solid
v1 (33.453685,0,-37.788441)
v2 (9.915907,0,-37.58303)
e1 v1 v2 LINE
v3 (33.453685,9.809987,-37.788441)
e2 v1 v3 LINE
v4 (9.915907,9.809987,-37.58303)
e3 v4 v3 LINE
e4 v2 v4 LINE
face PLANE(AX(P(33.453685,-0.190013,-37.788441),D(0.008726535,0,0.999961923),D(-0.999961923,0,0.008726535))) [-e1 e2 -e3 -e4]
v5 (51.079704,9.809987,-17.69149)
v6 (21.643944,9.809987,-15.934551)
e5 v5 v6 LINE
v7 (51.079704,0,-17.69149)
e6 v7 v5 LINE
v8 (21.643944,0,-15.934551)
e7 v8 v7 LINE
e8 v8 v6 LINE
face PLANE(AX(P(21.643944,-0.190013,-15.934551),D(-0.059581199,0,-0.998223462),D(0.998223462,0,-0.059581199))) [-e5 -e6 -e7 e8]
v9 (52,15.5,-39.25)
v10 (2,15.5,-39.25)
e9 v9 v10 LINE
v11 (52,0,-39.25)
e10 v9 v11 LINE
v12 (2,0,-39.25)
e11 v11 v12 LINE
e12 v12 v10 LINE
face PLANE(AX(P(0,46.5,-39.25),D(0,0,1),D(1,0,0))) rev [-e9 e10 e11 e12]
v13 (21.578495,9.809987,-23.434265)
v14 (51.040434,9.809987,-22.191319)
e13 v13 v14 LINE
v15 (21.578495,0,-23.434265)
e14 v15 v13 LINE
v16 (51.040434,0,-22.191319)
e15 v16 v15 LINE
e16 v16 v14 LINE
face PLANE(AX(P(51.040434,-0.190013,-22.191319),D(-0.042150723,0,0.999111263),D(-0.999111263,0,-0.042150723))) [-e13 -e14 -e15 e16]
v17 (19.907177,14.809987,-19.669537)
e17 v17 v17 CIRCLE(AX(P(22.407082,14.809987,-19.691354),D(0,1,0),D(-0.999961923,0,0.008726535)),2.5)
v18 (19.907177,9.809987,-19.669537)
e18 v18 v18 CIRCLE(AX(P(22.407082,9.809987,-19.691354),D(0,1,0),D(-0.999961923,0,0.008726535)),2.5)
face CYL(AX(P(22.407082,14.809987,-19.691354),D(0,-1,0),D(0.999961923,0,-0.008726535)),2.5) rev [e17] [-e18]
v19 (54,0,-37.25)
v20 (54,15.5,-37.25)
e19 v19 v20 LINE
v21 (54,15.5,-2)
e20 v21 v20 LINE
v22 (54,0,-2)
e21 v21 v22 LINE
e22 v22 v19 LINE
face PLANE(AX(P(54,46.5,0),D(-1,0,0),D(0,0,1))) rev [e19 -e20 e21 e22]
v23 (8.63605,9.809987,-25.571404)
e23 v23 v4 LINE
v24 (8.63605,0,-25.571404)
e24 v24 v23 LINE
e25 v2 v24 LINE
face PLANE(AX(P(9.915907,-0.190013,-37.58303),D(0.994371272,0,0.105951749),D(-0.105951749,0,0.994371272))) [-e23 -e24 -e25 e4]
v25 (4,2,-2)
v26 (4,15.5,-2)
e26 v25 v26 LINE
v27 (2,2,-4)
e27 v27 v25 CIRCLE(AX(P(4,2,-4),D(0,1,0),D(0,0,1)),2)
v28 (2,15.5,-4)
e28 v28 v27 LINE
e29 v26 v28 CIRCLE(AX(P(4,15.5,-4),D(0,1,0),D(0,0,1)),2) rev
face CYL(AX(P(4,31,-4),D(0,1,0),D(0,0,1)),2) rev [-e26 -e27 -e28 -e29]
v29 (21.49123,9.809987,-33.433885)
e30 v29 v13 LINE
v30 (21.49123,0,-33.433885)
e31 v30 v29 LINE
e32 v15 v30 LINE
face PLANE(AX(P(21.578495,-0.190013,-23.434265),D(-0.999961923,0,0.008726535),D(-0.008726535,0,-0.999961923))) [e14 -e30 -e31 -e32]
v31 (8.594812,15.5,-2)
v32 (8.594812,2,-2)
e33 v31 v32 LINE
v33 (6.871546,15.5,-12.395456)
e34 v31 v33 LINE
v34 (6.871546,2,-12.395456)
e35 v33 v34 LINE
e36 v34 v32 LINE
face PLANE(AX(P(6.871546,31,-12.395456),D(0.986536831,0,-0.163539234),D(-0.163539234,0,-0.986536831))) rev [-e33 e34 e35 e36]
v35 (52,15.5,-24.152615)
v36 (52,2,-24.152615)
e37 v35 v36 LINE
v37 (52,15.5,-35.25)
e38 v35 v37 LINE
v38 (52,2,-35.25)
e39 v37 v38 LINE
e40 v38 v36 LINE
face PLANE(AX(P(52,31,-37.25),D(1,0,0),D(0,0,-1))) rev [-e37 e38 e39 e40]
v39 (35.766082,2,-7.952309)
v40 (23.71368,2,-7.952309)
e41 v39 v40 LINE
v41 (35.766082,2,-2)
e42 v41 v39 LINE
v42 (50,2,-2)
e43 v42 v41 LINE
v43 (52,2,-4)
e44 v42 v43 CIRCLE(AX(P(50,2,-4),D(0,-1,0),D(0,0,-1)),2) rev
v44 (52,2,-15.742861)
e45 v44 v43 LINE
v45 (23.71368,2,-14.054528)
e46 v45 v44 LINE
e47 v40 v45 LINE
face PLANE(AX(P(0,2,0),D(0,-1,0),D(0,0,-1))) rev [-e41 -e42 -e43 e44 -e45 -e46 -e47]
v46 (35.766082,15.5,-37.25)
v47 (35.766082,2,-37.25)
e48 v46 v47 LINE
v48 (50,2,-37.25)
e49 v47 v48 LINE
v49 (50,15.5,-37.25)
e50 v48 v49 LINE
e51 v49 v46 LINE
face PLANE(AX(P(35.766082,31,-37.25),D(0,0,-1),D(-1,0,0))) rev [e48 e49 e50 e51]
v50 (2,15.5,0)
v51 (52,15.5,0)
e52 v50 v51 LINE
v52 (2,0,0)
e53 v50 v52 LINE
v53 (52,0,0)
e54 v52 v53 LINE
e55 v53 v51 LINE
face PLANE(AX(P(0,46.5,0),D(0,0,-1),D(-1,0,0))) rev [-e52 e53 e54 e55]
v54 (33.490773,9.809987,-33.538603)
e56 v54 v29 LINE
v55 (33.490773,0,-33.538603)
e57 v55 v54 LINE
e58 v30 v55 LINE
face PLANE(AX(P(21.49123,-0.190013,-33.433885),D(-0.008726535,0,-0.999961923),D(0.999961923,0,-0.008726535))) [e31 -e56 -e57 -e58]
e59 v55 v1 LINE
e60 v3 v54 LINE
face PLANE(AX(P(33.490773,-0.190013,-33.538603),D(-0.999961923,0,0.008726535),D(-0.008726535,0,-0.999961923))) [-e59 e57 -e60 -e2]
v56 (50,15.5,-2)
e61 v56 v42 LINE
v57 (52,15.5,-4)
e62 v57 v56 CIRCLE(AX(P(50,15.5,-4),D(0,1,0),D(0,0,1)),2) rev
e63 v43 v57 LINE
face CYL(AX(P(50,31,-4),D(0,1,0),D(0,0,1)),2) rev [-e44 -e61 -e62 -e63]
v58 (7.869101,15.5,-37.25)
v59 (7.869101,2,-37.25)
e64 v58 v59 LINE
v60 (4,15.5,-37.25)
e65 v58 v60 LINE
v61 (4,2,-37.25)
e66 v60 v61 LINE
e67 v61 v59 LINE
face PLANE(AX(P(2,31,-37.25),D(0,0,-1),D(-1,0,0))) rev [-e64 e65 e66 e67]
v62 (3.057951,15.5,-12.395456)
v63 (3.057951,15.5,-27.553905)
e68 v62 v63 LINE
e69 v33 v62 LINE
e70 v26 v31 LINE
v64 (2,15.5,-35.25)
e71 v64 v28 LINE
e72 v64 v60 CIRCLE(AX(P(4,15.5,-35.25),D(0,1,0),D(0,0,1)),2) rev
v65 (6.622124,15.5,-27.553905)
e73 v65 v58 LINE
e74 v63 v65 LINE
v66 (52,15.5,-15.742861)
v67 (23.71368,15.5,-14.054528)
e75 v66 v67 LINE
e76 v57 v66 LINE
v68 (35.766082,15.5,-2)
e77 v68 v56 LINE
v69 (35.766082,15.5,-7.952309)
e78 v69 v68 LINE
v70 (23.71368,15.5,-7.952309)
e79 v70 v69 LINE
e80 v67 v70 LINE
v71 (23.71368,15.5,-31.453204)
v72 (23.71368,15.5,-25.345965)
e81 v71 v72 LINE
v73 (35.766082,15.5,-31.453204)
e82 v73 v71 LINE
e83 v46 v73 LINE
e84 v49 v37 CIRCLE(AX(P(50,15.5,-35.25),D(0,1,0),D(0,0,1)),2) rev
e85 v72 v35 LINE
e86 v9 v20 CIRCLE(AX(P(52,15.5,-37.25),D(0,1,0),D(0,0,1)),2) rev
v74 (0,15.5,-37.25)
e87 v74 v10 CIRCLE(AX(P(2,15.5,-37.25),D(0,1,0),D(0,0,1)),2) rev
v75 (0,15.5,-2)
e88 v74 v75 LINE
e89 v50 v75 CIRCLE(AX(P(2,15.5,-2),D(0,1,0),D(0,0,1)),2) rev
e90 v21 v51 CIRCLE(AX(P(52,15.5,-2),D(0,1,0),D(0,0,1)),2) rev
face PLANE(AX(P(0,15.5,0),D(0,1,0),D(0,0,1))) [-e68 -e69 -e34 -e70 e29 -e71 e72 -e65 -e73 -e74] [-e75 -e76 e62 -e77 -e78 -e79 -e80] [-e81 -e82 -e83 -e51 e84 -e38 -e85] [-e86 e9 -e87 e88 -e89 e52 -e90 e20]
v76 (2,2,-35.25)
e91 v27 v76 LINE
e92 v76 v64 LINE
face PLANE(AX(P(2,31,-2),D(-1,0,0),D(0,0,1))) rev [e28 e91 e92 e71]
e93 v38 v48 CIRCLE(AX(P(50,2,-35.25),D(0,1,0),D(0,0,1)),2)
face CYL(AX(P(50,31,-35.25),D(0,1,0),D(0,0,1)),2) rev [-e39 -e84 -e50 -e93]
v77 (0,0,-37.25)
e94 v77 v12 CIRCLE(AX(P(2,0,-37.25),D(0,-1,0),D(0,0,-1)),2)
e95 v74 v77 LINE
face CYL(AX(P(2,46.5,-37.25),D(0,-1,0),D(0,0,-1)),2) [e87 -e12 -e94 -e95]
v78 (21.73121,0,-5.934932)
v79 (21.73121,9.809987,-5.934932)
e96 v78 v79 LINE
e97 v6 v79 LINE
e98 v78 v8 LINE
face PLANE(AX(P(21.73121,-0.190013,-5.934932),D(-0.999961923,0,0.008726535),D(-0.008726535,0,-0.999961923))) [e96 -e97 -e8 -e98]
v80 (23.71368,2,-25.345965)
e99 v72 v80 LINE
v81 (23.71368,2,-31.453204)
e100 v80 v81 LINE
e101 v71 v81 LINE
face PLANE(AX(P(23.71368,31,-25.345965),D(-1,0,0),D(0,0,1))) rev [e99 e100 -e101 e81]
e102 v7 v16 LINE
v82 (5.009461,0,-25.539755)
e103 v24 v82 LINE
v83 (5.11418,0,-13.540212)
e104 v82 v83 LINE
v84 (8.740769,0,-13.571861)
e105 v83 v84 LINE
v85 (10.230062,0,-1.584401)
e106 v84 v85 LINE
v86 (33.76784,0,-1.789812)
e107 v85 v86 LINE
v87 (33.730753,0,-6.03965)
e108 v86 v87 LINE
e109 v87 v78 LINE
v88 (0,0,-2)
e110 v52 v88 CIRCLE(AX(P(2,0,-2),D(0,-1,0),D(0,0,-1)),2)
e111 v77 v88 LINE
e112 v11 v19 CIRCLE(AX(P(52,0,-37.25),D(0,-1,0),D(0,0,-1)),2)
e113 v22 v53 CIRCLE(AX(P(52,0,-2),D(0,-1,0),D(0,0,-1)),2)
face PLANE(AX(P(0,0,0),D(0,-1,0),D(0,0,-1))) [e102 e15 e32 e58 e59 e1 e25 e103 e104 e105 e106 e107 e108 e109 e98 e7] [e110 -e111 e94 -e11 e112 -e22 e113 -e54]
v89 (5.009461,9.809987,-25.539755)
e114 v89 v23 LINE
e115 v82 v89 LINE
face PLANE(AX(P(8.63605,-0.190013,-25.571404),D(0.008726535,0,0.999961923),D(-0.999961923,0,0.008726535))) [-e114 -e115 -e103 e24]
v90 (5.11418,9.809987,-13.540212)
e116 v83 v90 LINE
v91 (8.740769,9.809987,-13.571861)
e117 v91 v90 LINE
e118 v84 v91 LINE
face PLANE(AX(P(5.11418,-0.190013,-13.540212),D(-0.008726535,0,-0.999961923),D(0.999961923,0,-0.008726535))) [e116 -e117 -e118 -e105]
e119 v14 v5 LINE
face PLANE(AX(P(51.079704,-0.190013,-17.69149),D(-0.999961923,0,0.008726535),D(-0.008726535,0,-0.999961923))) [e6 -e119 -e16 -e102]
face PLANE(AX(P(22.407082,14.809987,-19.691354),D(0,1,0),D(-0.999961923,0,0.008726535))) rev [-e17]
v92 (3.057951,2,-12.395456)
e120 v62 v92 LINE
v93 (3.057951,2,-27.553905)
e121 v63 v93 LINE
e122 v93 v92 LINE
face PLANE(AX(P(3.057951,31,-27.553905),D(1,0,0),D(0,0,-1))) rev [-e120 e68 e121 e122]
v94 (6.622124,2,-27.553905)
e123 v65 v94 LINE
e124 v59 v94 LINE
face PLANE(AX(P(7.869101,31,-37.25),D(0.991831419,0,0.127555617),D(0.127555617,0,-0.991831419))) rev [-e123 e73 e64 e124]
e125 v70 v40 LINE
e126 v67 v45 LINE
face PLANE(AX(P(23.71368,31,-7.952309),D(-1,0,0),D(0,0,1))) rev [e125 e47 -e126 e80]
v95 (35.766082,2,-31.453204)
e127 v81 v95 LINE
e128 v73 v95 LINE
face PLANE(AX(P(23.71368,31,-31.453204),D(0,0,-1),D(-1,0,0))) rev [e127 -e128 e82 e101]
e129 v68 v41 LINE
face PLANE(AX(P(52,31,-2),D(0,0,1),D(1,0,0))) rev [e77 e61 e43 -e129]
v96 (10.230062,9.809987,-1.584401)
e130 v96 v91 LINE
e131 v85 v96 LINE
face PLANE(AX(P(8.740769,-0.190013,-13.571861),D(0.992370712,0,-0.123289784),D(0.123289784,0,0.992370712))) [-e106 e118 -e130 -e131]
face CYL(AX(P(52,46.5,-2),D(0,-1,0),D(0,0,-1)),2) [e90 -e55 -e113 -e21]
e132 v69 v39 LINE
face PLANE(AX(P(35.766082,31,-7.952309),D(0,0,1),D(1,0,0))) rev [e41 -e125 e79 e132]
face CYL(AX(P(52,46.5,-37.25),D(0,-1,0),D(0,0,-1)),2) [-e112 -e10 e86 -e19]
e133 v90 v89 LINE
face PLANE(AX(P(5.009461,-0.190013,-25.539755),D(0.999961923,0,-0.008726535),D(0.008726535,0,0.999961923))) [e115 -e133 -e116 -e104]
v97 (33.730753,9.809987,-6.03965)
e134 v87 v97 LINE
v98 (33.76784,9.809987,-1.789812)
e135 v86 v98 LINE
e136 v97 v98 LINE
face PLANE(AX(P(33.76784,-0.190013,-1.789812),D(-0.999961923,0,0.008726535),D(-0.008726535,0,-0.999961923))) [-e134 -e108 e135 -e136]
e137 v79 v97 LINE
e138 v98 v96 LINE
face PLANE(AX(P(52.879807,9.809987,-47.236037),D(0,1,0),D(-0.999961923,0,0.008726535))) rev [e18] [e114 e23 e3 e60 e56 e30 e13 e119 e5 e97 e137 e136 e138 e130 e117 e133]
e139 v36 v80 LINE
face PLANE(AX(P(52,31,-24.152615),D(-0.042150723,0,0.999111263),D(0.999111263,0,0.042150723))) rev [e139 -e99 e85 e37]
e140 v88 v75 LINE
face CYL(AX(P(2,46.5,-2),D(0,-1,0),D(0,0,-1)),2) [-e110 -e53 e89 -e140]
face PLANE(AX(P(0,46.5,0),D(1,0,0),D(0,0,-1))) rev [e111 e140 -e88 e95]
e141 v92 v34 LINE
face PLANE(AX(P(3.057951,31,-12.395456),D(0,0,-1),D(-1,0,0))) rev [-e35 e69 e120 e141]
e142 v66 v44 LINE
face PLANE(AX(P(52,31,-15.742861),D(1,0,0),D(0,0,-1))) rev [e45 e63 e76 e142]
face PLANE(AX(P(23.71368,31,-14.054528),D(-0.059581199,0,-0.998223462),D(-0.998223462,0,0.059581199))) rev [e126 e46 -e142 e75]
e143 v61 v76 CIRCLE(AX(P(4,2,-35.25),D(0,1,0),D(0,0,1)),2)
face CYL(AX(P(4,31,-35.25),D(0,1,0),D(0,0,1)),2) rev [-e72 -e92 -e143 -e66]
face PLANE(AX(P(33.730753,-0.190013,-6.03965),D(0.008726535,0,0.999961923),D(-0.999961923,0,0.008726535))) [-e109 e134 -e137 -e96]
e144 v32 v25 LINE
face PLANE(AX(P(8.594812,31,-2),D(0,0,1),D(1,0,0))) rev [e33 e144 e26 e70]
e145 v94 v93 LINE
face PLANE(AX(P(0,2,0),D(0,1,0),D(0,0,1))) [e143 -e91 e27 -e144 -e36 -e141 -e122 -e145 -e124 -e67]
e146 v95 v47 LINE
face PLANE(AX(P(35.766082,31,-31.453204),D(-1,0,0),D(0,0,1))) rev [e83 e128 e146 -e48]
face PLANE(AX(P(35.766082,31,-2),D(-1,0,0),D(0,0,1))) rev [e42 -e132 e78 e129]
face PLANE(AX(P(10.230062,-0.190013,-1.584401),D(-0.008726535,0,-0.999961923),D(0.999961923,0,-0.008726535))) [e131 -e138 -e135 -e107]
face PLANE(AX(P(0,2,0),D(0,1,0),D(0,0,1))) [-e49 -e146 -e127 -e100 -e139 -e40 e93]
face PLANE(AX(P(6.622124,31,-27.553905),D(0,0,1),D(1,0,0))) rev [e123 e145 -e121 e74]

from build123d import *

# Parameters (mm, degrees)
SKETCH1_W              = 54
SKETCH1_H              = 39.25
BOSS_EXTRUDE1_DEPTH    = 46.5
FILLET1_R              = 2
FILLET2_R              = 2
Z_95_START             = -0.023652431
Z_95_BLANK_DEPTH       = 10
Z_95_START_2           = -5.023652431
Z_95_BLANK_2_OUTLINE_R = 2.5
Z_95_BLANK_2_DEPTH     = 5
BODY_MOVE_COPY3_ANGLE  = 180
BODY_MOVE_COPY4_ANGLE  = 89.5
SKETCH4_W              = 54
SKETCH4_H              = 39.25
CUT_EXTRUDE1_DEPTH     = 31
CUT_EXTRUDE2_DEPTH     = 31
BOSS_EXTRUDE2_DEPTH    = 2
FILLET3_R              = 2
FILLET4_R              = 2
FILLET5_R              = 2
FILLET6_R              = 2


with BuildPart() as part:
    # Sketch1 → Boss-Extrude1 (new body)
    with BuildSketch(Plane(origin=(0, 0, 0), x_dir=(1, 0, 0), z_dir=(0, 1, 0))):
        with Locations((27, 19.625)):
            Rectangle(SKETCH1_W, SKETCH1_H)
    extrude(amount=BOSS_EXTRUDE1_DEPTH)

    # Fillet1
    fillet1_edges = [part.edges().sort_by_distance(p)[0] for p in [
        (0, 23.25, 0),
    ]]
    fillet(fillet1_edges, radius=FILLET1_R)

    # Fillet2
    fillet2_edges = [part.edges().sort_by_distance(p)[0] for p in [
        (0, 23.25, -39.25),
        (54, 23.25, -39.25),
        (54, 23.25, 0),
    ]]
    fillet(fillet2_edges, radius=FILLET2_R)


with BuildPart() as body_2:
    # Z-95 Blank: read off the stored shape, not the designer's step
    # Z-95 Blank outline → Z-95 Blank (new body)
    with BuildSketch(Plane(origin=(0, 0, 0), x_dir=(1, 0, 0), z_dir=(0, 1, 0)).offset(Z_95_START)):
        Polygon((-39.475833264, 51.689675598), (-39.475833264, 48.062948495), (-51.475833264, 46.678320586), (-51.475833264, 23.139646129), (-47.225833264, 23.139646129), (-47.225833264, 35.139646129), (-37.225833264, 35.139646129), (-35.725833264, 5.689675598), (-31.225833264, 5.689675598), (-29.725833264, 35.139646129), (-19.725833264, 35.139646129), (-19.725833264, 23.139646129), (-15.475833264, 23.139646129), (-15.475833264, 46.678320586), (-27.475833264, 48.062948495), (-27.475833264, 51.689675598), align=None)
    extrude(amount=Z_95_BLANK_DEPTH)

    # Z-95 Blank 2 outline → Z-95 Blank 2 (add)
    with BuildSketch(Plane(origin=(0, 0, 0), x_dir=(1, 0, 0), z_dir=(0, 1, 0)).offset(Z_95_START_2)):
        with Locations((-33.475833264, 34.343753809)):
            Circle(Z_95_BLANK_2_OUTLINE_R)
    extrude(amount=Z_95_BLANK_2_DEPTH)


with BuildPart() as body_2_1:
    # Body-Move/Copy3: moved
    add(body_2.part.rotate(Axis((0, 2.476347569, -28.689675598), (1, 0, 0)), BODY_MOVE_COPY3_ANGLE))


with BuildPart() as body_2_2:
    # Body-Move/Copy4: moved
    add(body_2_1.part.rotate(Axis((-33.475833264, 0, -28.689675598), (0, -1, 0)), BODY_MOVE_COPY4_ANGLE))


with BuildPart() as body_2_3:
    # Body-Move/Copy5: moved
    add(body_2_2.part.moved(Location((61.536777905, 5.06338101, 8.948981511))))


with BuildPart() as body_2_4:
    # Body-Move/Copy6: moved
    add(body_2_3.part.moved(Location((0, -0.229742035, 0))))


with BuildPart() as part_1:
    add(part.part)

    # Intersect1: read off the stored shape, not the designer's step
    # Intersect1: cut body 2
    add(body_2_4.part, mode=Mode.SUBTRACT)

    # Sketch4 → Cut-Extrude1 (cut)
    with BuildSketch(Plane(origin=(0, 46.5, 0), x_dir=(1, 0, 0), z_dir=(0, 1, 0))):
        with Locations((27, 19.625)):
            Rectangle(SKETCH4_W, SKETCH4_H)
    extrude(amount=-CUT_EXTRUDE1_DEPTH, mode=Mode.SUBTRACT)

    # Sketch5 → Cut-Extrude2 (cut)
    with BuildSketch(Plane(origin=(0, 0, 0), x_dir=(-1, 0, 0), z_dir=(0, -1, 0))):
        Polygon((-23.713680343, 7.952308665), (-23.713680343, 14.054528407), (-52, 15.742860627), (-52, 2), (-35.766082295, 2), (-35.766082295, 7.952308665), align=None)
        Polygon((-23.713680343, 25.345964802), (-23.713680343, 31.453203507), (-35.766082295, 31.453203507), (-35.766082295, 37.25), (-52, 37.25), (-52, 24.152615413), align=None)
        Polygon((-6.871546498, 12.395456139), (-8.594812047, 2), (-2, 2), (-2, 37.25), (-7.869100925, 37.25), (-6.622123507, 27.553904956), (-3.057950712, 27.553904956), (-3.057950712, 12.395456139), align=None)
    extrude(amount=-CUT_EXTRUDE2_DEPTH, mode=Mode.SUBTRACT)

    # Sketch6 → Boss-Extrude2 (add)
    with BuildSketch(Plane.XZ):
        Polygon((52, -24.152615413), (23.713680343, -25.345964802), (23.713680343, -31.453203507), (35.766082295, -31.453203507), (35.766082295, -37.25), (52, -37.25), align=None)
        Polygon((52, -15.742860627), (23.713680343, -14.054528407), (23.713680343, -7.952308665), (35.766082295, -7.952308665), (35.766082295, -2), (52, -2), align=None)
        Polygon((8.594812047, -2), (6.871546498, -12.395456139), (3.057950712, -12.395456139), (3.057950712, -27.553904956), (6.622123507, -27.553904956), (7.869100925, -37.25), (2, -37.25), (2, -2), align=None)
    extrude(amount=-BOSS_EXTRUDE2_DEPTH)

    # Fillet3
    fillet3_edges = [part_1.edges().sort_by_distance(p)[0] for p in [
        (52, 8.75, -2),
    ]]
    fillet(fillet3_edges, radius=FILLET3_R)

    # Fillet4
    fillet4_edges = [part_1.edges().sort_by_distance(p)[0] for p in [
        (2, 8.75, -2),
    ]]
    fillet(fillet4_edges, radius=FILLET4_R)

    # Fillet5
    fillet5_edges = [part_1.edges().sort_by_distance(p)[0] for p in [
        (52, 8.75, -37.25),
    ]]
    fillet(fillet5_edges, radius=FILLET5_R)

    # Fillet6
    fillet6_edges = [part_1.edges().sort_by_distance(p)[0] for p in [
        (2, 8.75, -37.25),
    ]]
    fillet(fillet6_edges, radius=FILLET6_R)


solid = part_1.part
